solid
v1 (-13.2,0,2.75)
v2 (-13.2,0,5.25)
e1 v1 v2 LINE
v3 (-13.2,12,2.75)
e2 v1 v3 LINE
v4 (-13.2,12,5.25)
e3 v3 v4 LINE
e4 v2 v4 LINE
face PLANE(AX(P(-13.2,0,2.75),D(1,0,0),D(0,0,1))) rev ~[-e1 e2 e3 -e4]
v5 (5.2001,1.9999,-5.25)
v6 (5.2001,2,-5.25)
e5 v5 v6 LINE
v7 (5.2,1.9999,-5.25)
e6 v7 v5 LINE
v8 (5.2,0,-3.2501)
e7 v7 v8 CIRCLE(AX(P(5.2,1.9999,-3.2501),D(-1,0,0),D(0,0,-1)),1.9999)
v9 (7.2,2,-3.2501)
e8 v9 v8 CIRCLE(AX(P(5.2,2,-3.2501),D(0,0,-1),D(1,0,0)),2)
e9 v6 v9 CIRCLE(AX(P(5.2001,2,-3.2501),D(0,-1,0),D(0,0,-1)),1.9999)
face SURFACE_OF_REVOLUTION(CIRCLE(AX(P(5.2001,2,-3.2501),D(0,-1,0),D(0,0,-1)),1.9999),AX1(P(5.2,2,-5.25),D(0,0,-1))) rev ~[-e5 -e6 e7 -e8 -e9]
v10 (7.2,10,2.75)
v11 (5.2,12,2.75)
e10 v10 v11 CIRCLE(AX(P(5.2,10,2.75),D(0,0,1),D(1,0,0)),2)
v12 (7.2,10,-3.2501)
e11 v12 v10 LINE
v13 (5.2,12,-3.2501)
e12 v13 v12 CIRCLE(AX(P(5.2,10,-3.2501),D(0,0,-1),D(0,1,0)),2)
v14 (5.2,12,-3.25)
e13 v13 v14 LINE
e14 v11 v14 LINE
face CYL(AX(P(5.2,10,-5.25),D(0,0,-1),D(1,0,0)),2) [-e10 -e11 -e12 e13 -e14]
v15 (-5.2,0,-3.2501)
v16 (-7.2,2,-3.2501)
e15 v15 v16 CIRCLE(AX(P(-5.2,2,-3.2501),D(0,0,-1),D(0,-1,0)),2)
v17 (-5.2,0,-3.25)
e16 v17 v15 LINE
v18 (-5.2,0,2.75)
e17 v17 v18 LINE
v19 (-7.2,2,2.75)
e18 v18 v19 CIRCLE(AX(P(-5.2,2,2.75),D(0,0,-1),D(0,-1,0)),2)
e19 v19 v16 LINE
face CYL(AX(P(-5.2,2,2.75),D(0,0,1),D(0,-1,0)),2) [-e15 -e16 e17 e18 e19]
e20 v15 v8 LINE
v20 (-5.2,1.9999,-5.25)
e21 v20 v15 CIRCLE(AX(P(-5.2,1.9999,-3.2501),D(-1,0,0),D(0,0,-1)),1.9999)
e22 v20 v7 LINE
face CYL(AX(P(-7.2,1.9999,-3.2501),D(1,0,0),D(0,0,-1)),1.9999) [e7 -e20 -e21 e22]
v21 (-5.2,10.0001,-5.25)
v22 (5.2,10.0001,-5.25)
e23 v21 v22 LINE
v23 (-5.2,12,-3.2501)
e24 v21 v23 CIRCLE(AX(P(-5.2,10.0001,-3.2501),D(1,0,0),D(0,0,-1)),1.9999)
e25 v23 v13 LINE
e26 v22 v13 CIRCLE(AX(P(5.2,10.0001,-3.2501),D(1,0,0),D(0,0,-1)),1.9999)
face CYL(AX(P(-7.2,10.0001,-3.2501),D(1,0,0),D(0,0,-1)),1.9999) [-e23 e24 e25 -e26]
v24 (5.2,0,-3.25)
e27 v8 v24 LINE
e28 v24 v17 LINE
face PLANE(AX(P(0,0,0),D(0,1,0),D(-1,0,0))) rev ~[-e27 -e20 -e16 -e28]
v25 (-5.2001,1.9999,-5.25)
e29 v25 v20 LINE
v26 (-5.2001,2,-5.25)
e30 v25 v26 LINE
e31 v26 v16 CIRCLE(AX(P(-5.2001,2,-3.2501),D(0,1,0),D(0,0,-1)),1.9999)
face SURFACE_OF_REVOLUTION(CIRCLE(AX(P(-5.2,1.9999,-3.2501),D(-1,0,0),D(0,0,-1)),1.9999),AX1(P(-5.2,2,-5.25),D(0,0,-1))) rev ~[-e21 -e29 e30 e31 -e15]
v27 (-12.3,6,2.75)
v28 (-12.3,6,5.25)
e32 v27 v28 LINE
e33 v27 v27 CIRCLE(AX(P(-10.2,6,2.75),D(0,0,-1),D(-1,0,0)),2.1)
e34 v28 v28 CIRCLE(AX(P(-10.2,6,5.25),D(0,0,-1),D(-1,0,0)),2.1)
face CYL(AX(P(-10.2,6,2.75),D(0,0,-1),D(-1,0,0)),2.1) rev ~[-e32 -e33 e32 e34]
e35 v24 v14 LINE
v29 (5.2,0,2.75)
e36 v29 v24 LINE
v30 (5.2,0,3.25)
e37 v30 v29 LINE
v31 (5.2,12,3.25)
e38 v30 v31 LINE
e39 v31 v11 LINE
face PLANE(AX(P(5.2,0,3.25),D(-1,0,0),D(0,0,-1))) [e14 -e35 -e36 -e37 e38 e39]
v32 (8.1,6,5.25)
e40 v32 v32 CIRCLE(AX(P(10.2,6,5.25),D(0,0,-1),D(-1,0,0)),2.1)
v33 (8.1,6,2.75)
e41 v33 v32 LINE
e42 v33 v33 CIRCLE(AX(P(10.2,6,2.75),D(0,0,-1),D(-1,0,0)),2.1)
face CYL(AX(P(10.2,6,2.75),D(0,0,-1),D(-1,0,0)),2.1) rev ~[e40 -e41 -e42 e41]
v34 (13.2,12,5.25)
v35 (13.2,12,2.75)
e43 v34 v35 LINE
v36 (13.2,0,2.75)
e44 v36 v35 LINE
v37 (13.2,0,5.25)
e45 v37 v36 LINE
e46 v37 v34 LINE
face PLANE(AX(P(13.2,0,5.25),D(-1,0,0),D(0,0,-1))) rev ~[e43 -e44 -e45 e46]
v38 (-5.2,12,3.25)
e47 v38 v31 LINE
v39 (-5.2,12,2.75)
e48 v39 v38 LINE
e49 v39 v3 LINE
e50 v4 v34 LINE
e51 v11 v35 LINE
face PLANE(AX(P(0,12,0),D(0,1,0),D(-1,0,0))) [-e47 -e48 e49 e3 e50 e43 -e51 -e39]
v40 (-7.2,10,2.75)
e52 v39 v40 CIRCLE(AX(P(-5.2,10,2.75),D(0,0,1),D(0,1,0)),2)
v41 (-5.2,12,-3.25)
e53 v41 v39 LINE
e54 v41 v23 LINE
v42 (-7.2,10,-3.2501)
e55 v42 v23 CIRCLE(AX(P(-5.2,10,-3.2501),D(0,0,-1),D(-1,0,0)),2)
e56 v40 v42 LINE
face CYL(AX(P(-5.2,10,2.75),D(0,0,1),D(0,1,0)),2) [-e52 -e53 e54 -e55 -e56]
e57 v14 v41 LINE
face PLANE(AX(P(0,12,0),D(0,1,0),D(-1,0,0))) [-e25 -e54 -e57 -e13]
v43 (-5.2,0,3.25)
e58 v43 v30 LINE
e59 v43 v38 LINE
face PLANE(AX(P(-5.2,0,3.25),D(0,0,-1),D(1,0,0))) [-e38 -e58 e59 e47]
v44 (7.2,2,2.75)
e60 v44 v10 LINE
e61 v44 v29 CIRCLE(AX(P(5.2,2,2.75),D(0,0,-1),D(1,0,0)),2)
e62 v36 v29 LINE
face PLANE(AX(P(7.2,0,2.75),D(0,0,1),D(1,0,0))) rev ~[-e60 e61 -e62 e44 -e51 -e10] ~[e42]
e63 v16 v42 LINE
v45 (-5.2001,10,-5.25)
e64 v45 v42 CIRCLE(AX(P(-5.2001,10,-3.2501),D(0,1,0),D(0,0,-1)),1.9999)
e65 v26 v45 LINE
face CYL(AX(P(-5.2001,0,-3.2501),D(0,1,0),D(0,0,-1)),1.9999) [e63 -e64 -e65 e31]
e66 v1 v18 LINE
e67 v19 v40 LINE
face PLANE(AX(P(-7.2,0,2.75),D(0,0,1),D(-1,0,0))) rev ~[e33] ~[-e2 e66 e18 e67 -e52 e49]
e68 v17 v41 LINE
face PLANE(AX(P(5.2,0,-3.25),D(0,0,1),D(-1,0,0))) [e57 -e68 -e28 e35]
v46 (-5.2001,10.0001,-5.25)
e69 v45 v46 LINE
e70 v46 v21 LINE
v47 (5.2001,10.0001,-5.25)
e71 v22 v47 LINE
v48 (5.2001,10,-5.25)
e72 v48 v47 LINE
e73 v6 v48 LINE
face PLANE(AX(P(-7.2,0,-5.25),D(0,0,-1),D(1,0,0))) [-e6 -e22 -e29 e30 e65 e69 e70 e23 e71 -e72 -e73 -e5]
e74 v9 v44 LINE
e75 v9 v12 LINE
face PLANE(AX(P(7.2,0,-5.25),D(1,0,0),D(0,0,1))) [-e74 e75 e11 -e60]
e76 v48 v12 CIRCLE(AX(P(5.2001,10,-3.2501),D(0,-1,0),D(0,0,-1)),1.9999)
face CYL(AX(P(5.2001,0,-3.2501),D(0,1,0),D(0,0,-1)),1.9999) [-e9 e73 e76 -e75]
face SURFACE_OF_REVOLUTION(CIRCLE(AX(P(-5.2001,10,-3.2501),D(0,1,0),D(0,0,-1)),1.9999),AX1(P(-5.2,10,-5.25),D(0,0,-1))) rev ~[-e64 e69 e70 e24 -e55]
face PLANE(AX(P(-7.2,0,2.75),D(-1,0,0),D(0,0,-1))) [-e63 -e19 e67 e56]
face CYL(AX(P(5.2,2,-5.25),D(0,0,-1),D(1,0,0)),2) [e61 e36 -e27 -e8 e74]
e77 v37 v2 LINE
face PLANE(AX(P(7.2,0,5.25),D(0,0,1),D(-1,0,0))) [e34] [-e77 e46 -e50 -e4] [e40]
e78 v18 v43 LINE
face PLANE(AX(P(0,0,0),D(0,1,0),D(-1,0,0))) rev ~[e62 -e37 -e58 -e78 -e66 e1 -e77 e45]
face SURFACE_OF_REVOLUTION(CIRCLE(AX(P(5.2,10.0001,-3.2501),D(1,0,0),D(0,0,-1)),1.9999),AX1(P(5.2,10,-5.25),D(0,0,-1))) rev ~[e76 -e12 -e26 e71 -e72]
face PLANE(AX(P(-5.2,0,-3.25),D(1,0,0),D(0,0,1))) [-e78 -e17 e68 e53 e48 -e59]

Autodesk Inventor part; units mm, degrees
ref_plane "YZ Plane" through (0, 0, 0) normal (1, 0, 0) x (0, 1, 0)
ref_plane "XZ Plane" through (0, 0, 0) normal (0, 1, 0) x (-1, 0, 0)
ref_plane "XY Plane" through (0, 0, 0) normal (0, 0, 1) x (1, 0, 0)
sketch "Sketch1" plane through (0, 0, 0) normal (0, 1, 0) x (-1, 0, 0)
  line L0 (5.2, 3.25) -> (-5.2, 3.25)
  line L1 (-5.2, 3.25) -> (-5.2, -3.25)
  line L2 (-5.2, -3.25) -> (5.2, -3.25)
  line L3 (5.2, -3.25) -> (5.2, 3.25)
  line L4 (0, -3.25) -> (0, 3.25) construction
  line L5 (5.2, 0) -> (-5.2, 0) construction
  line L6 (7.2, -5.25) -> (-7.2, -5.25)
  line L7 (-7.2, -5.25) -> (-7.2, 5.25)
  line L8 (-7.2, 5.25) -> (7.2, 5.25)
  line L9 (7.2, 5.25) -> (7.2, -5.25)
  line L10 (-13.2, 2.75) -> (-7.2, 2.75)
  line L11 (-7.2, 2.75) -> (-7.2, 5.25)
  line L12 (-7.2, 5.25) -> (-13.2, 5.25)
  line L13 (-13.2, 5.25) -> (-13.2, 2.75)
  line L14 (7.2, 2.75) -> (13.2, 2.75)
  line L15 (13.2, 2.75) -> (13.2, 5.25)
  line L16 (13.2, 5.25) -> (7.2, 5.25)
  line L17 (7.2, 5.25) -> (7.2, 2.75)
  point P0 (0, 0)
  dimension "d0" = 10.4
  dimension "d1" = 6.5
  dimension "d4" = 2
  dimension "d5" = 2
  dimension "d6" = 2
  dimension "d7" = 2
  dimension "d8" = 2.5
  dimension "d9" = 2.5
  dimension "d10" = 6
  dimension "d11" = 6
extrude "Extrusion2" add sketch "Sketch1" along normal blind 12
sketch "Sketch2" plane through (13.2, 0, 2.75) normal (0, 0, -1) x (-1, 0, 0)
  line L0 (26.4, 0) -> (20.4, 0) construction
  line L1 (20.4, 0) -> (20.4, 12) construction
  line L2 (20.4, 12) -> (26.4, 12) construction
  line L3 (26.4, 12) -> (26.4, 0) construction
  line L4 (20.4, 0) -> (26.4, 0) construction
  line L5 (26.4, 0) -> (26.4, 12) construction
  line L6 (20.4, 0) -> (20.4, 12) construction
  line L7 (20.4, 12) -> (26.4, 12) construction
  line L8 (23.4, 0) -> (23.4, 12) construction
  line L9 (26.4, 6) -> (20.4, 6) construction
  circle A0 centre (15.4635, 5.7038) radius 3.0285
  circle A1 centre (23.4, 6) radius 2.1
  line L10 (13.2, -1.4538) -> (13.2, 18.2002) construction
  circle A2 centre (3, 6) radius 2.1
  point P0 (13.2, 0)
  point P1 (23.4, 6)
  dimension "d15" = 4.2
extrude "Extrusion3" cut sketch "Sketch2" against normal up to surface (2.5 mm away) contours A1 | A2
fillet "Fillet1" radius 2 4 edges at (7.2, 6, -5.25) (-7.2, 6, -5.25) (0, 12, -5.25) (0, 0, -5.25)
fillet "Fillet2" radius 2 8 edges at (-6.6142, 11.4142, -4.6642) (-7.2, 12, -0.25) (6.6142, 11.4142, -4.6642) (7.2, 12, -0.2501) (6.6142, 0.5858, -4.6642) (7.2, 0, -0.2501) (-6.6142, 0.5858, -4.6642) (-7.2, 0, -0.25)
equation "\"d5\" = d4"
equation "\"d6\" = d4"
equation "\"d7\" = d4"
equation "\"d9\" = d8"
equation "\"d10\" = d11"
properties part number "USBholder version 1"
